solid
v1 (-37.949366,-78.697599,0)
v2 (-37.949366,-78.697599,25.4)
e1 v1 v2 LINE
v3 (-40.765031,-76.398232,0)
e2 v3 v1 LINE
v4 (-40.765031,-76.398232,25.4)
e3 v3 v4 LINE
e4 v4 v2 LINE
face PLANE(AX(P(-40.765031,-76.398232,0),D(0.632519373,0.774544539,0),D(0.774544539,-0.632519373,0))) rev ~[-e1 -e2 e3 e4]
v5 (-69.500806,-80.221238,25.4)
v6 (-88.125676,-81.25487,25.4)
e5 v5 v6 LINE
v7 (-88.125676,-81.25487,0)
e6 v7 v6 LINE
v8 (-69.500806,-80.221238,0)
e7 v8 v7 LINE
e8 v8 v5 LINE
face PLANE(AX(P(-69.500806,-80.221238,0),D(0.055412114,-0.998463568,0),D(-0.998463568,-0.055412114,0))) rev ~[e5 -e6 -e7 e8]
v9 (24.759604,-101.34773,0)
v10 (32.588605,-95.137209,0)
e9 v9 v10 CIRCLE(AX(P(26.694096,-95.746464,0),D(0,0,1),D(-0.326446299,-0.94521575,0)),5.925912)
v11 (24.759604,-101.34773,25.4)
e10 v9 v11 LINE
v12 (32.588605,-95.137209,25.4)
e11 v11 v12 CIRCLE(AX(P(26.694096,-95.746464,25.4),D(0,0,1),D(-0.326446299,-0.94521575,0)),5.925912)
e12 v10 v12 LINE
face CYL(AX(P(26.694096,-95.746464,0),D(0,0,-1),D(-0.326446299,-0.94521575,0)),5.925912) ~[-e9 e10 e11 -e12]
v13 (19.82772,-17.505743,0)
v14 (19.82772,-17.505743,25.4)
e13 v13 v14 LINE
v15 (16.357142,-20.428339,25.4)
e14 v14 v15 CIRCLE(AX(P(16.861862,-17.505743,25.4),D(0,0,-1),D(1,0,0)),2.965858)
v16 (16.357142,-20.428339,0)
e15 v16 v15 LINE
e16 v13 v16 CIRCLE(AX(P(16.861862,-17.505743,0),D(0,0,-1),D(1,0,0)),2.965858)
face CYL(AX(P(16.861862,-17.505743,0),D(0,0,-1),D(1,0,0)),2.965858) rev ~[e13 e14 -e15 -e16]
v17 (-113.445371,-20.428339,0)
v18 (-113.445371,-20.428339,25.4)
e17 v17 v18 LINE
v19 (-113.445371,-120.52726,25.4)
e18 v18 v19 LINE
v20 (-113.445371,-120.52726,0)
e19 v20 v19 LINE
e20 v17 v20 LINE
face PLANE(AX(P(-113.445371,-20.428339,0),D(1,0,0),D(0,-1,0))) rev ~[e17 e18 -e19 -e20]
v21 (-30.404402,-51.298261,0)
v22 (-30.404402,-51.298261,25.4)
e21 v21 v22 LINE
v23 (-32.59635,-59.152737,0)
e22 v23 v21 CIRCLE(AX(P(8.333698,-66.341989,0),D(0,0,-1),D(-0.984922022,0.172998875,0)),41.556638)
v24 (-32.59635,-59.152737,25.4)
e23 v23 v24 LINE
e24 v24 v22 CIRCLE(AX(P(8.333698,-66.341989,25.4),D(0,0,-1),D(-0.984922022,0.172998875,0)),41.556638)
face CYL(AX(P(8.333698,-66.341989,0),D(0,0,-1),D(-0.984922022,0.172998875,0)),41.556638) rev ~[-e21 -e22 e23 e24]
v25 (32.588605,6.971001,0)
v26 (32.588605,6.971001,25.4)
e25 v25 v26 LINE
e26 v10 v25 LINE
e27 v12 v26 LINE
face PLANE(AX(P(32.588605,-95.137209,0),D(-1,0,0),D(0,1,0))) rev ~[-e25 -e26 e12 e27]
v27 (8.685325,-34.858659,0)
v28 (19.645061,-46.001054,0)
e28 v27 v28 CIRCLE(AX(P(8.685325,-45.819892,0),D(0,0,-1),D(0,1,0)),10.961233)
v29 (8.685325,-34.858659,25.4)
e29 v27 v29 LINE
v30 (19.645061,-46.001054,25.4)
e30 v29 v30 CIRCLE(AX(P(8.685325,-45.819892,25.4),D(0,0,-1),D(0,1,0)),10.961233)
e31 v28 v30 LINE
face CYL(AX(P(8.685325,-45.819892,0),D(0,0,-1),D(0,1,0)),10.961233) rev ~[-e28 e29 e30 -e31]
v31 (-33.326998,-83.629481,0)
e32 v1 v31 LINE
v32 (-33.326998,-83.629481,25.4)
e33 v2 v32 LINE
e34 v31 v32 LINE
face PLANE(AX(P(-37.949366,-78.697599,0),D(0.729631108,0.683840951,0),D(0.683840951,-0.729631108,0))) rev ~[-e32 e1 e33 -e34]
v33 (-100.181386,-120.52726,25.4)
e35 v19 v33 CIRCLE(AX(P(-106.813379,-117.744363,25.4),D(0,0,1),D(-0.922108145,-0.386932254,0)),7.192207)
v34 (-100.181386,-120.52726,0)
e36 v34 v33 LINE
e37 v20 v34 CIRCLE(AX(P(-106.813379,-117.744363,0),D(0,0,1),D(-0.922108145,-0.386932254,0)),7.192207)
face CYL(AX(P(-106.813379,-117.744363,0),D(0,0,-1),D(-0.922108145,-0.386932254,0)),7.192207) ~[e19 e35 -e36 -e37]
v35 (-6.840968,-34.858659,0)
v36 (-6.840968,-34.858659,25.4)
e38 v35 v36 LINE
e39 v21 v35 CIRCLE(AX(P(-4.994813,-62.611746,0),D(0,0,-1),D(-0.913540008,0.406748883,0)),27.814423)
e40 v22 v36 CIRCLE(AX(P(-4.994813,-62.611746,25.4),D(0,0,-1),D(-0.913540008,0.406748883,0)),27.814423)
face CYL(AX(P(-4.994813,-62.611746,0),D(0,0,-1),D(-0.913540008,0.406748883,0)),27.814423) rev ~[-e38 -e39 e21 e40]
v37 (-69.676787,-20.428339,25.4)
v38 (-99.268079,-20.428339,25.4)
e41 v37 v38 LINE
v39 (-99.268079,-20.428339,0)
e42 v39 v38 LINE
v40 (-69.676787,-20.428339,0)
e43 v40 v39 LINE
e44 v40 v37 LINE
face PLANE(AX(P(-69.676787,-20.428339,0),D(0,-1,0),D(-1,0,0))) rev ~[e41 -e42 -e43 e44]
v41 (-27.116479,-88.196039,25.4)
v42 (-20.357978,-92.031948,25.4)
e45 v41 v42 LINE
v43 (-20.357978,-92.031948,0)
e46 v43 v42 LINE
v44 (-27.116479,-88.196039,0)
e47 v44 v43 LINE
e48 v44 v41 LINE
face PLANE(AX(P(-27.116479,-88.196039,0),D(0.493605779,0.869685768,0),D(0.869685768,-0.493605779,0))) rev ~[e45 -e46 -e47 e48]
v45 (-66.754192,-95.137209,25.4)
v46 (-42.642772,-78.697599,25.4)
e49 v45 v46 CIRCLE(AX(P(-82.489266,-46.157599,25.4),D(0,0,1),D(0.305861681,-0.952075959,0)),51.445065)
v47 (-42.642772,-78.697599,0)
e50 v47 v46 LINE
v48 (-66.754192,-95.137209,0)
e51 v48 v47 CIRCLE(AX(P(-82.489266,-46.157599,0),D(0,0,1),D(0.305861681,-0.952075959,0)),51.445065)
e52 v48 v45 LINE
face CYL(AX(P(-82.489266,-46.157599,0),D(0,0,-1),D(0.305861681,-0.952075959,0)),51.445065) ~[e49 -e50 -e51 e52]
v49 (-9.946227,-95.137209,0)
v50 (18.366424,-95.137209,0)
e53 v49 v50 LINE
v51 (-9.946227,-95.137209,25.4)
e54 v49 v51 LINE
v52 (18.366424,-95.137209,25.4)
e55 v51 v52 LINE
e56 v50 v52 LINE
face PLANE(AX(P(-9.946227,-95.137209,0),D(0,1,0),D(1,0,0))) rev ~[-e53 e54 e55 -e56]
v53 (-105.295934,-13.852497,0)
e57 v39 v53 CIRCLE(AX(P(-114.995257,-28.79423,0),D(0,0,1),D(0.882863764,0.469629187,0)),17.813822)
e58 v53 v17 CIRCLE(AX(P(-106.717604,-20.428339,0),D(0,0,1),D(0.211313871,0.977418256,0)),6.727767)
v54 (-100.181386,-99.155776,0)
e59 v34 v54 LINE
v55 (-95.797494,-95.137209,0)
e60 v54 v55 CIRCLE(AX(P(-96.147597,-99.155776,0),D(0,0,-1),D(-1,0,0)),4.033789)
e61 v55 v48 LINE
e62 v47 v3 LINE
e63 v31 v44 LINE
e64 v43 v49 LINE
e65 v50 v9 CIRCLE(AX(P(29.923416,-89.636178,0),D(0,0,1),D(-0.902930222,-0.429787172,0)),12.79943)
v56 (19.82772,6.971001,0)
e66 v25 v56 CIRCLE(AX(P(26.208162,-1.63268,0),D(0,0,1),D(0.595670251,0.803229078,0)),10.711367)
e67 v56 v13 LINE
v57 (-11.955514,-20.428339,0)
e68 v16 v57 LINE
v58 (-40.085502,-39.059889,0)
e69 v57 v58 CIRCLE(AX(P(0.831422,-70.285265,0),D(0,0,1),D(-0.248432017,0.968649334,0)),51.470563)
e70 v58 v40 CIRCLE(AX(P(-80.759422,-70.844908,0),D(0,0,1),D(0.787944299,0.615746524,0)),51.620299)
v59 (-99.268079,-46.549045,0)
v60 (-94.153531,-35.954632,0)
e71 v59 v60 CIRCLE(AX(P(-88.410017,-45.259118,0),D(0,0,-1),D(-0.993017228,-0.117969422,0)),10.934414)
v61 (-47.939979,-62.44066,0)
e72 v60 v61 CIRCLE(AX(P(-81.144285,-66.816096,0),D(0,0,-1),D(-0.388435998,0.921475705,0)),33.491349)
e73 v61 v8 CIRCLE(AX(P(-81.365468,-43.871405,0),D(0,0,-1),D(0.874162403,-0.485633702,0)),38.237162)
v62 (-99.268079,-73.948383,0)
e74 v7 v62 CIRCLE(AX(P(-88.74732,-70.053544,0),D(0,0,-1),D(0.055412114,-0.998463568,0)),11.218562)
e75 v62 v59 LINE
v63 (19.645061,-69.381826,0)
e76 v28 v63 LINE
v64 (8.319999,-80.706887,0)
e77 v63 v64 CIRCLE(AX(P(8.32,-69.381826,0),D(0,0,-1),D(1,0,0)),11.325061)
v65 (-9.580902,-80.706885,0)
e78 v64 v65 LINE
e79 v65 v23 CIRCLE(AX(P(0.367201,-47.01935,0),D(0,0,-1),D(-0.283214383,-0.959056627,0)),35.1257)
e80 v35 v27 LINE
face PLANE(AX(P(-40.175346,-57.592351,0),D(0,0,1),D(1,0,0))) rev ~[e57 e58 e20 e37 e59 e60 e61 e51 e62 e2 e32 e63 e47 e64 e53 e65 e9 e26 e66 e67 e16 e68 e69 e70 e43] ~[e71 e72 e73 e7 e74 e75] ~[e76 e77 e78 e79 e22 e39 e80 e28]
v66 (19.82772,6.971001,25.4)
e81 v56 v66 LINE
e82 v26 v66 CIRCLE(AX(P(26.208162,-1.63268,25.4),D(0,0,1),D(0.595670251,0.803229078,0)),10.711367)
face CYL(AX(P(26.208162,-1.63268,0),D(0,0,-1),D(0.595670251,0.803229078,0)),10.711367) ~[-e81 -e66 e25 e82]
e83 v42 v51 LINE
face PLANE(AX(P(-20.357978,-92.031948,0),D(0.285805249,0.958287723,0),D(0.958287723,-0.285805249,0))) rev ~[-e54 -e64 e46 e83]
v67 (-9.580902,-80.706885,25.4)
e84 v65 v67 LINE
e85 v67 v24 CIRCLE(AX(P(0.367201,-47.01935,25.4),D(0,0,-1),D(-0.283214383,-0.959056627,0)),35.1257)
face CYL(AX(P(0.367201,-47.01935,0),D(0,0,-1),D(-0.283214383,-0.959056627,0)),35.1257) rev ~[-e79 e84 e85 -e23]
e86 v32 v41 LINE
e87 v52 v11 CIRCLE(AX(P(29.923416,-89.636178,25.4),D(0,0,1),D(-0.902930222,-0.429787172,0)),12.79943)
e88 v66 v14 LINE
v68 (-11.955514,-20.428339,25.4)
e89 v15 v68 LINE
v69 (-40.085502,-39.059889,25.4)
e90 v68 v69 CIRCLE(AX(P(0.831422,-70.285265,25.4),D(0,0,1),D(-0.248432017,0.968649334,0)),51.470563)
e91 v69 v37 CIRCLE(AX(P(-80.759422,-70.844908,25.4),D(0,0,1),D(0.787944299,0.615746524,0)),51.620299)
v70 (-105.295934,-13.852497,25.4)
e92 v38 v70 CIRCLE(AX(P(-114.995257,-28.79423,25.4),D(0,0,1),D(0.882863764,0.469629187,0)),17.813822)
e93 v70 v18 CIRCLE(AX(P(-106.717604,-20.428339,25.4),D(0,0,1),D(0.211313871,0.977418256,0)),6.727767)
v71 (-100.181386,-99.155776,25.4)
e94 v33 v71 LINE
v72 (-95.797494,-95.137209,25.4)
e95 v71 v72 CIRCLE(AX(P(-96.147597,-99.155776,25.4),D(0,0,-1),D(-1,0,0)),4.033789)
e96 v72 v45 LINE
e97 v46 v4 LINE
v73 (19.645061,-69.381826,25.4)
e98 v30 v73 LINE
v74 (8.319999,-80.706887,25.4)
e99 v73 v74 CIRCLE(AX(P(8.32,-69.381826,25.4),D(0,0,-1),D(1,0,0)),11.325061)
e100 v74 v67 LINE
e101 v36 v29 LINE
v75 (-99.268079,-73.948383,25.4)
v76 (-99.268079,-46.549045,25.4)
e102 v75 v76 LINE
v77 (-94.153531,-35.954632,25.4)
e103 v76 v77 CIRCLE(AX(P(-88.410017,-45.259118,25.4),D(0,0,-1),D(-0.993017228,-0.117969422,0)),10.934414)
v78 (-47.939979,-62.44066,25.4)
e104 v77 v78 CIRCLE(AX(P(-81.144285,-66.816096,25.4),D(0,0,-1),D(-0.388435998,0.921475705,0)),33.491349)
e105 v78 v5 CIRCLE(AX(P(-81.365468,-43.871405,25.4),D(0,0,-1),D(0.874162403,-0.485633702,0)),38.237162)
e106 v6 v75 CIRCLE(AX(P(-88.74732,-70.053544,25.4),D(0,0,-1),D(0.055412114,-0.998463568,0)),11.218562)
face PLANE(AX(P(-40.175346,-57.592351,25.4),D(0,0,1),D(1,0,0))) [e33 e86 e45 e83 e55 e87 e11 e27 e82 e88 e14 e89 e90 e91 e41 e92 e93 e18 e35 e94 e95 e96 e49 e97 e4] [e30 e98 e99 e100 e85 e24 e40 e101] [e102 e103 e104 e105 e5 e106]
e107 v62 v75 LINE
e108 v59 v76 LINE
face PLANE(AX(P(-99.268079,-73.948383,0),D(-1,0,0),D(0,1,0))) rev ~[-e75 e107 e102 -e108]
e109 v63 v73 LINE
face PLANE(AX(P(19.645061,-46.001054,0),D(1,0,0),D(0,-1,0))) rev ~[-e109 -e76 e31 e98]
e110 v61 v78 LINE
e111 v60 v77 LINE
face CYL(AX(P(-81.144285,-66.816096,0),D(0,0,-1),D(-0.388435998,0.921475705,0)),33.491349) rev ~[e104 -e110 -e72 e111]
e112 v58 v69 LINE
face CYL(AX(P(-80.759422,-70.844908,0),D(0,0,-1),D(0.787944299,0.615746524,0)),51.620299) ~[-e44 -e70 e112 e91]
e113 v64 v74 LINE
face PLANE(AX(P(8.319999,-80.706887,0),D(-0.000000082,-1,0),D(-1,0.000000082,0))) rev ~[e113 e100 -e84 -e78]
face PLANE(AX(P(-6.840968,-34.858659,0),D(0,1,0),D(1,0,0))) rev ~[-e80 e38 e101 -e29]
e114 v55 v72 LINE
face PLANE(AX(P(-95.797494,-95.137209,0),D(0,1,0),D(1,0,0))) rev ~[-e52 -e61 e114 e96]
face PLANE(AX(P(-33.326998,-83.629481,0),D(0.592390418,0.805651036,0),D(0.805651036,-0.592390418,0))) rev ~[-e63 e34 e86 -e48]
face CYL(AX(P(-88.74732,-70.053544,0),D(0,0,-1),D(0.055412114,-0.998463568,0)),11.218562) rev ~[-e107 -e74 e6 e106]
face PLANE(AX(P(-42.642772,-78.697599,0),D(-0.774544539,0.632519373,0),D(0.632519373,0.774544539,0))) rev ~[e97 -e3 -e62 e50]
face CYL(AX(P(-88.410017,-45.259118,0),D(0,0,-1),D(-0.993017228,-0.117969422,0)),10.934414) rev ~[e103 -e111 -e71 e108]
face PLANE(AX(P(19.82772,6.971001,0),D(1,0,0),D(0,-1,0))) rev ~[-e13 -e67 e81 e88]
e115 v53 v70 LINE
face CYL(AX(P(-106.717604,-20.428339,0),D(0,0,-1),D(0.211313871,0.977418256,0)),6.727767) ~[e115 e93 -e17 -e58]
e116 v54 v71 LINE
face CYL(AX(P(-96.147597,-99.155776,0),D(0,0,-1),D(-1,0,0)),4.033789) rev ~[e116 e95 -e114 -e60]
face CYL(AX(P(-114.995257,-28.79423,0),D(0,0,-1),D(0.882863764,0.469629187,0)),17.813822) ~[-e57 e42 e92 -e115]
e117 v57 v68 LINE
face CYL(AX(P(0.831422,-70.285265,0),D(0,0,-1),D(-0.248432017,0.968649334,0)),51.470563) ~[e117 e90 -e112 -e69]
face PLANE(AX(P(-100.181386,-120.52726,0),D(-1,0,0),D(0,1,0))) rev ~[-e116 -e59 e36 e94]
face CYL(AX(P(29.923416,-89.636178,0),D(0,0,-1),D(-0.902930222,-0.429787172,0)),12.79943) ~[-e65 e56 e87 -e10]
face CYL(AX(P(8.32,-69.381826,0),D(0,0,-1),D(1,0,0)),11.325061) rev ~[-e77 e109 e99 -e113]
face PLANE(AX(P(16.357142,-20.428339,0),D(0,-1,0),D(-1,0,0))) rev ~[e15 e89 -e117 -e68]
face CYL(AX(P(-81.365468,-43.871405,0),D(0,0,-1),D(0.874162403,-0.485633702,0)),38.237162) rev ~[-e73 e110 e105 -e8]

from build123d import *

# Parameters (mm, degrees)
F2_DEPTH = 25.4


# Not quite as in the source:
# - the program builds the solid bodies; features that only make, move or delete a surface that nothing else refers to are left out


with BuildPart() as f2:
    # F0 (on Top) → F2 (new body)
    with BuildSketch(Plane.XY):
        with BuildLine():
            ThreePointArc((-105.2959337831, -13.8524966314), (-110.9424227524, -15.1925239823), (-113.4453713894, -20.4283390194))
            Line((-113.4453713894, -20.4283390194), (-113.4453713894, -120.5272600055))
            ThreePointArc((-113.4453713894, -120.5272600055), (-106.8133786321, -124.9365702093), (-100.1813858747, -120.5272600055))
            Line((-100.1813858747, -120.5272600055), (-100.1813858747, -99.1557762027))
            ThreePointArc((-100.1813858747, -99.1557762027), (-98.8733273351, -96.1822516833), (-95.7974940538, -95.1372087002))
            Line((-95.7974940538, -95.1372087002), (-66.7541921139, -95.1372087002))
            ThreePointArc((-66.7541921139, -95.1372087002), (-53.508361005, -88.6629146032), (-42.6427721977, -78.6975994706))
            Line((-42.6427721977, -78.6975994706), (-40.7650305092, -76.3982318447))
            Line((-40.7650305092, -76.3982318447), (-37.9493655476, -78.6975994706))
            Line((-37.9493655476, -78.6975994706), (-33.326998353, -83.6294814944))
            Line((-33.326998353, -83.6294814944), (-27.1164793521, -88.1960391998))
            Line((-27.1164793521, -88.1960391998), (-20.3579775989, -92.0319482684))
            Line((-20.3579775989, -92.0319482684), (-9.9462270737, -95.1372087002))
            Line((-9.9462270737, -95.1372087002), (-1.5437625116, -95.1372087002))
            Line((-1.5437625116, -95.1372087002), (11.6079188883, -95.1372087002))
            Line((11.6079188883, -95.1372087002), (18.3664243668, -95.1372087002))
            ThreePointArc((18.3664243668, -95.1372087002), (21.0049540589, -98.8169422623), (24.7596036643, -101.3477295637))
            ThreePointArc((24.7596036643, -101.3477295637), (30.3769038734, -100.3890234282), (32.5886048377, -95.1372087002))
            Line((32.5886048377, -95.1372087002), (32.5886048377, -83.264157176))
            Line((32.5886048377, -83.264157176), (32.5886048377, -36.867942661))
            Line((32.5886048377, -36.867942661), (32.5886048377, 6.9710011594))
            ThreePointArc((32.5886048377, 6.9710011594), (26.2081623077, 9.0786866715), (19.8277197778, 6.9710011594))
            Line((19.8277197778, 6.9710011594), (19.8277197778, -17.5057426095))
            ThreePointArc((19.8277197778, -17.5057426095), (18.7722789641, -19.7743587388), (16.3571424782, -20.4283390194))
            Line((16.3571424782, -20.4283390194), (-11.9555136189, -20.4283390194))
            ThreePointArc((-11.9555136189, -20.4283390194), (-27.5905728803, -27.3736232216), (-40.0855019689, -39.0598885715))
            ThreePointArc((-40.0855019689, -39.0598885715), (-53.2554420129, -27.1621160119), (-69.6767866611, -20.4283390194))
            Line((-69.6767866611, -20.4283390194), (-99.268078804, -20.4283390194))
            ThreePointArc((-99.268078804, -20.4283390194), (-101.8637236034, -16.7569920607), (-105.2959337831, -13.8524966314))
        make_face()
        with BuildLine():
            ThreePointArc((-94.1535308957, -35.954631865), (-64.4908309504, -37.7586891963), (-47.9399785399, -62.4406598508))
            ThreePointArc((-47.9399785399, -62.4406598508), (-57.037773934, -73.3713012414), (-69.5008059195, -80.2212381733))
            Line((-69.5008059195, -80.2212381733), (-88.1256759167, -81.2548696995))
            ThreePointArc((-88.1256759167, -81.2548696995), (-94.899092444, -79.4350063569), (-99.268078804, -73.9483833313))
            Line((-99.268078804, -73.9483833313), (-99.268078804, -46.5490445495))
            ThreePointArc((-99.268078804, -46.5490445495), (-98.2570203257, -40.5053887944), (-94.1535308957, -35.954631865))
        make_face(mode=Mode.SUBTRACT)
        with BuildLine():
            ThreePointArc((-30.4044019431, -51.2982606888), (-20.909712223, -39.8003863828), (-6.8409675732, -34.8586589098))
            Line((-6.8409675732, -34.8586589098), (8.6853252724, -34.8586589098))
            ThreePointArc((8.6853252724, -34.8586589098), (16.4998756565, -38.1334471627), (19.6450613439, -46.0010543466))
            Line((19.6450613439, -46.0010543466), (19.6450613439, -69.3818256259))
            ThreePointArc((19.6450613439, -69.3818256259), (16.328027351, -77.3898536128), (8.3199990913, -80.7068869472))
            Line((8.3199990913, -80.7068869472), (-9.5809019141, -80.7068854751))
            ThreePointArc((-9.5809019141, -80.7068854751), (-23.6431681808, -72.6575432123), (-32.5963497162, -59.1527372599))
            ThreePointArc((-32.5963497162, -59.1527372599), (-31.6935007339, -55.171603632), (-30.4044019431, -51.2982606888))
        make_face(mode=Mode.SUBTRACT)
    extrude(amount=F2_DEPTH)


solid = f2.part
